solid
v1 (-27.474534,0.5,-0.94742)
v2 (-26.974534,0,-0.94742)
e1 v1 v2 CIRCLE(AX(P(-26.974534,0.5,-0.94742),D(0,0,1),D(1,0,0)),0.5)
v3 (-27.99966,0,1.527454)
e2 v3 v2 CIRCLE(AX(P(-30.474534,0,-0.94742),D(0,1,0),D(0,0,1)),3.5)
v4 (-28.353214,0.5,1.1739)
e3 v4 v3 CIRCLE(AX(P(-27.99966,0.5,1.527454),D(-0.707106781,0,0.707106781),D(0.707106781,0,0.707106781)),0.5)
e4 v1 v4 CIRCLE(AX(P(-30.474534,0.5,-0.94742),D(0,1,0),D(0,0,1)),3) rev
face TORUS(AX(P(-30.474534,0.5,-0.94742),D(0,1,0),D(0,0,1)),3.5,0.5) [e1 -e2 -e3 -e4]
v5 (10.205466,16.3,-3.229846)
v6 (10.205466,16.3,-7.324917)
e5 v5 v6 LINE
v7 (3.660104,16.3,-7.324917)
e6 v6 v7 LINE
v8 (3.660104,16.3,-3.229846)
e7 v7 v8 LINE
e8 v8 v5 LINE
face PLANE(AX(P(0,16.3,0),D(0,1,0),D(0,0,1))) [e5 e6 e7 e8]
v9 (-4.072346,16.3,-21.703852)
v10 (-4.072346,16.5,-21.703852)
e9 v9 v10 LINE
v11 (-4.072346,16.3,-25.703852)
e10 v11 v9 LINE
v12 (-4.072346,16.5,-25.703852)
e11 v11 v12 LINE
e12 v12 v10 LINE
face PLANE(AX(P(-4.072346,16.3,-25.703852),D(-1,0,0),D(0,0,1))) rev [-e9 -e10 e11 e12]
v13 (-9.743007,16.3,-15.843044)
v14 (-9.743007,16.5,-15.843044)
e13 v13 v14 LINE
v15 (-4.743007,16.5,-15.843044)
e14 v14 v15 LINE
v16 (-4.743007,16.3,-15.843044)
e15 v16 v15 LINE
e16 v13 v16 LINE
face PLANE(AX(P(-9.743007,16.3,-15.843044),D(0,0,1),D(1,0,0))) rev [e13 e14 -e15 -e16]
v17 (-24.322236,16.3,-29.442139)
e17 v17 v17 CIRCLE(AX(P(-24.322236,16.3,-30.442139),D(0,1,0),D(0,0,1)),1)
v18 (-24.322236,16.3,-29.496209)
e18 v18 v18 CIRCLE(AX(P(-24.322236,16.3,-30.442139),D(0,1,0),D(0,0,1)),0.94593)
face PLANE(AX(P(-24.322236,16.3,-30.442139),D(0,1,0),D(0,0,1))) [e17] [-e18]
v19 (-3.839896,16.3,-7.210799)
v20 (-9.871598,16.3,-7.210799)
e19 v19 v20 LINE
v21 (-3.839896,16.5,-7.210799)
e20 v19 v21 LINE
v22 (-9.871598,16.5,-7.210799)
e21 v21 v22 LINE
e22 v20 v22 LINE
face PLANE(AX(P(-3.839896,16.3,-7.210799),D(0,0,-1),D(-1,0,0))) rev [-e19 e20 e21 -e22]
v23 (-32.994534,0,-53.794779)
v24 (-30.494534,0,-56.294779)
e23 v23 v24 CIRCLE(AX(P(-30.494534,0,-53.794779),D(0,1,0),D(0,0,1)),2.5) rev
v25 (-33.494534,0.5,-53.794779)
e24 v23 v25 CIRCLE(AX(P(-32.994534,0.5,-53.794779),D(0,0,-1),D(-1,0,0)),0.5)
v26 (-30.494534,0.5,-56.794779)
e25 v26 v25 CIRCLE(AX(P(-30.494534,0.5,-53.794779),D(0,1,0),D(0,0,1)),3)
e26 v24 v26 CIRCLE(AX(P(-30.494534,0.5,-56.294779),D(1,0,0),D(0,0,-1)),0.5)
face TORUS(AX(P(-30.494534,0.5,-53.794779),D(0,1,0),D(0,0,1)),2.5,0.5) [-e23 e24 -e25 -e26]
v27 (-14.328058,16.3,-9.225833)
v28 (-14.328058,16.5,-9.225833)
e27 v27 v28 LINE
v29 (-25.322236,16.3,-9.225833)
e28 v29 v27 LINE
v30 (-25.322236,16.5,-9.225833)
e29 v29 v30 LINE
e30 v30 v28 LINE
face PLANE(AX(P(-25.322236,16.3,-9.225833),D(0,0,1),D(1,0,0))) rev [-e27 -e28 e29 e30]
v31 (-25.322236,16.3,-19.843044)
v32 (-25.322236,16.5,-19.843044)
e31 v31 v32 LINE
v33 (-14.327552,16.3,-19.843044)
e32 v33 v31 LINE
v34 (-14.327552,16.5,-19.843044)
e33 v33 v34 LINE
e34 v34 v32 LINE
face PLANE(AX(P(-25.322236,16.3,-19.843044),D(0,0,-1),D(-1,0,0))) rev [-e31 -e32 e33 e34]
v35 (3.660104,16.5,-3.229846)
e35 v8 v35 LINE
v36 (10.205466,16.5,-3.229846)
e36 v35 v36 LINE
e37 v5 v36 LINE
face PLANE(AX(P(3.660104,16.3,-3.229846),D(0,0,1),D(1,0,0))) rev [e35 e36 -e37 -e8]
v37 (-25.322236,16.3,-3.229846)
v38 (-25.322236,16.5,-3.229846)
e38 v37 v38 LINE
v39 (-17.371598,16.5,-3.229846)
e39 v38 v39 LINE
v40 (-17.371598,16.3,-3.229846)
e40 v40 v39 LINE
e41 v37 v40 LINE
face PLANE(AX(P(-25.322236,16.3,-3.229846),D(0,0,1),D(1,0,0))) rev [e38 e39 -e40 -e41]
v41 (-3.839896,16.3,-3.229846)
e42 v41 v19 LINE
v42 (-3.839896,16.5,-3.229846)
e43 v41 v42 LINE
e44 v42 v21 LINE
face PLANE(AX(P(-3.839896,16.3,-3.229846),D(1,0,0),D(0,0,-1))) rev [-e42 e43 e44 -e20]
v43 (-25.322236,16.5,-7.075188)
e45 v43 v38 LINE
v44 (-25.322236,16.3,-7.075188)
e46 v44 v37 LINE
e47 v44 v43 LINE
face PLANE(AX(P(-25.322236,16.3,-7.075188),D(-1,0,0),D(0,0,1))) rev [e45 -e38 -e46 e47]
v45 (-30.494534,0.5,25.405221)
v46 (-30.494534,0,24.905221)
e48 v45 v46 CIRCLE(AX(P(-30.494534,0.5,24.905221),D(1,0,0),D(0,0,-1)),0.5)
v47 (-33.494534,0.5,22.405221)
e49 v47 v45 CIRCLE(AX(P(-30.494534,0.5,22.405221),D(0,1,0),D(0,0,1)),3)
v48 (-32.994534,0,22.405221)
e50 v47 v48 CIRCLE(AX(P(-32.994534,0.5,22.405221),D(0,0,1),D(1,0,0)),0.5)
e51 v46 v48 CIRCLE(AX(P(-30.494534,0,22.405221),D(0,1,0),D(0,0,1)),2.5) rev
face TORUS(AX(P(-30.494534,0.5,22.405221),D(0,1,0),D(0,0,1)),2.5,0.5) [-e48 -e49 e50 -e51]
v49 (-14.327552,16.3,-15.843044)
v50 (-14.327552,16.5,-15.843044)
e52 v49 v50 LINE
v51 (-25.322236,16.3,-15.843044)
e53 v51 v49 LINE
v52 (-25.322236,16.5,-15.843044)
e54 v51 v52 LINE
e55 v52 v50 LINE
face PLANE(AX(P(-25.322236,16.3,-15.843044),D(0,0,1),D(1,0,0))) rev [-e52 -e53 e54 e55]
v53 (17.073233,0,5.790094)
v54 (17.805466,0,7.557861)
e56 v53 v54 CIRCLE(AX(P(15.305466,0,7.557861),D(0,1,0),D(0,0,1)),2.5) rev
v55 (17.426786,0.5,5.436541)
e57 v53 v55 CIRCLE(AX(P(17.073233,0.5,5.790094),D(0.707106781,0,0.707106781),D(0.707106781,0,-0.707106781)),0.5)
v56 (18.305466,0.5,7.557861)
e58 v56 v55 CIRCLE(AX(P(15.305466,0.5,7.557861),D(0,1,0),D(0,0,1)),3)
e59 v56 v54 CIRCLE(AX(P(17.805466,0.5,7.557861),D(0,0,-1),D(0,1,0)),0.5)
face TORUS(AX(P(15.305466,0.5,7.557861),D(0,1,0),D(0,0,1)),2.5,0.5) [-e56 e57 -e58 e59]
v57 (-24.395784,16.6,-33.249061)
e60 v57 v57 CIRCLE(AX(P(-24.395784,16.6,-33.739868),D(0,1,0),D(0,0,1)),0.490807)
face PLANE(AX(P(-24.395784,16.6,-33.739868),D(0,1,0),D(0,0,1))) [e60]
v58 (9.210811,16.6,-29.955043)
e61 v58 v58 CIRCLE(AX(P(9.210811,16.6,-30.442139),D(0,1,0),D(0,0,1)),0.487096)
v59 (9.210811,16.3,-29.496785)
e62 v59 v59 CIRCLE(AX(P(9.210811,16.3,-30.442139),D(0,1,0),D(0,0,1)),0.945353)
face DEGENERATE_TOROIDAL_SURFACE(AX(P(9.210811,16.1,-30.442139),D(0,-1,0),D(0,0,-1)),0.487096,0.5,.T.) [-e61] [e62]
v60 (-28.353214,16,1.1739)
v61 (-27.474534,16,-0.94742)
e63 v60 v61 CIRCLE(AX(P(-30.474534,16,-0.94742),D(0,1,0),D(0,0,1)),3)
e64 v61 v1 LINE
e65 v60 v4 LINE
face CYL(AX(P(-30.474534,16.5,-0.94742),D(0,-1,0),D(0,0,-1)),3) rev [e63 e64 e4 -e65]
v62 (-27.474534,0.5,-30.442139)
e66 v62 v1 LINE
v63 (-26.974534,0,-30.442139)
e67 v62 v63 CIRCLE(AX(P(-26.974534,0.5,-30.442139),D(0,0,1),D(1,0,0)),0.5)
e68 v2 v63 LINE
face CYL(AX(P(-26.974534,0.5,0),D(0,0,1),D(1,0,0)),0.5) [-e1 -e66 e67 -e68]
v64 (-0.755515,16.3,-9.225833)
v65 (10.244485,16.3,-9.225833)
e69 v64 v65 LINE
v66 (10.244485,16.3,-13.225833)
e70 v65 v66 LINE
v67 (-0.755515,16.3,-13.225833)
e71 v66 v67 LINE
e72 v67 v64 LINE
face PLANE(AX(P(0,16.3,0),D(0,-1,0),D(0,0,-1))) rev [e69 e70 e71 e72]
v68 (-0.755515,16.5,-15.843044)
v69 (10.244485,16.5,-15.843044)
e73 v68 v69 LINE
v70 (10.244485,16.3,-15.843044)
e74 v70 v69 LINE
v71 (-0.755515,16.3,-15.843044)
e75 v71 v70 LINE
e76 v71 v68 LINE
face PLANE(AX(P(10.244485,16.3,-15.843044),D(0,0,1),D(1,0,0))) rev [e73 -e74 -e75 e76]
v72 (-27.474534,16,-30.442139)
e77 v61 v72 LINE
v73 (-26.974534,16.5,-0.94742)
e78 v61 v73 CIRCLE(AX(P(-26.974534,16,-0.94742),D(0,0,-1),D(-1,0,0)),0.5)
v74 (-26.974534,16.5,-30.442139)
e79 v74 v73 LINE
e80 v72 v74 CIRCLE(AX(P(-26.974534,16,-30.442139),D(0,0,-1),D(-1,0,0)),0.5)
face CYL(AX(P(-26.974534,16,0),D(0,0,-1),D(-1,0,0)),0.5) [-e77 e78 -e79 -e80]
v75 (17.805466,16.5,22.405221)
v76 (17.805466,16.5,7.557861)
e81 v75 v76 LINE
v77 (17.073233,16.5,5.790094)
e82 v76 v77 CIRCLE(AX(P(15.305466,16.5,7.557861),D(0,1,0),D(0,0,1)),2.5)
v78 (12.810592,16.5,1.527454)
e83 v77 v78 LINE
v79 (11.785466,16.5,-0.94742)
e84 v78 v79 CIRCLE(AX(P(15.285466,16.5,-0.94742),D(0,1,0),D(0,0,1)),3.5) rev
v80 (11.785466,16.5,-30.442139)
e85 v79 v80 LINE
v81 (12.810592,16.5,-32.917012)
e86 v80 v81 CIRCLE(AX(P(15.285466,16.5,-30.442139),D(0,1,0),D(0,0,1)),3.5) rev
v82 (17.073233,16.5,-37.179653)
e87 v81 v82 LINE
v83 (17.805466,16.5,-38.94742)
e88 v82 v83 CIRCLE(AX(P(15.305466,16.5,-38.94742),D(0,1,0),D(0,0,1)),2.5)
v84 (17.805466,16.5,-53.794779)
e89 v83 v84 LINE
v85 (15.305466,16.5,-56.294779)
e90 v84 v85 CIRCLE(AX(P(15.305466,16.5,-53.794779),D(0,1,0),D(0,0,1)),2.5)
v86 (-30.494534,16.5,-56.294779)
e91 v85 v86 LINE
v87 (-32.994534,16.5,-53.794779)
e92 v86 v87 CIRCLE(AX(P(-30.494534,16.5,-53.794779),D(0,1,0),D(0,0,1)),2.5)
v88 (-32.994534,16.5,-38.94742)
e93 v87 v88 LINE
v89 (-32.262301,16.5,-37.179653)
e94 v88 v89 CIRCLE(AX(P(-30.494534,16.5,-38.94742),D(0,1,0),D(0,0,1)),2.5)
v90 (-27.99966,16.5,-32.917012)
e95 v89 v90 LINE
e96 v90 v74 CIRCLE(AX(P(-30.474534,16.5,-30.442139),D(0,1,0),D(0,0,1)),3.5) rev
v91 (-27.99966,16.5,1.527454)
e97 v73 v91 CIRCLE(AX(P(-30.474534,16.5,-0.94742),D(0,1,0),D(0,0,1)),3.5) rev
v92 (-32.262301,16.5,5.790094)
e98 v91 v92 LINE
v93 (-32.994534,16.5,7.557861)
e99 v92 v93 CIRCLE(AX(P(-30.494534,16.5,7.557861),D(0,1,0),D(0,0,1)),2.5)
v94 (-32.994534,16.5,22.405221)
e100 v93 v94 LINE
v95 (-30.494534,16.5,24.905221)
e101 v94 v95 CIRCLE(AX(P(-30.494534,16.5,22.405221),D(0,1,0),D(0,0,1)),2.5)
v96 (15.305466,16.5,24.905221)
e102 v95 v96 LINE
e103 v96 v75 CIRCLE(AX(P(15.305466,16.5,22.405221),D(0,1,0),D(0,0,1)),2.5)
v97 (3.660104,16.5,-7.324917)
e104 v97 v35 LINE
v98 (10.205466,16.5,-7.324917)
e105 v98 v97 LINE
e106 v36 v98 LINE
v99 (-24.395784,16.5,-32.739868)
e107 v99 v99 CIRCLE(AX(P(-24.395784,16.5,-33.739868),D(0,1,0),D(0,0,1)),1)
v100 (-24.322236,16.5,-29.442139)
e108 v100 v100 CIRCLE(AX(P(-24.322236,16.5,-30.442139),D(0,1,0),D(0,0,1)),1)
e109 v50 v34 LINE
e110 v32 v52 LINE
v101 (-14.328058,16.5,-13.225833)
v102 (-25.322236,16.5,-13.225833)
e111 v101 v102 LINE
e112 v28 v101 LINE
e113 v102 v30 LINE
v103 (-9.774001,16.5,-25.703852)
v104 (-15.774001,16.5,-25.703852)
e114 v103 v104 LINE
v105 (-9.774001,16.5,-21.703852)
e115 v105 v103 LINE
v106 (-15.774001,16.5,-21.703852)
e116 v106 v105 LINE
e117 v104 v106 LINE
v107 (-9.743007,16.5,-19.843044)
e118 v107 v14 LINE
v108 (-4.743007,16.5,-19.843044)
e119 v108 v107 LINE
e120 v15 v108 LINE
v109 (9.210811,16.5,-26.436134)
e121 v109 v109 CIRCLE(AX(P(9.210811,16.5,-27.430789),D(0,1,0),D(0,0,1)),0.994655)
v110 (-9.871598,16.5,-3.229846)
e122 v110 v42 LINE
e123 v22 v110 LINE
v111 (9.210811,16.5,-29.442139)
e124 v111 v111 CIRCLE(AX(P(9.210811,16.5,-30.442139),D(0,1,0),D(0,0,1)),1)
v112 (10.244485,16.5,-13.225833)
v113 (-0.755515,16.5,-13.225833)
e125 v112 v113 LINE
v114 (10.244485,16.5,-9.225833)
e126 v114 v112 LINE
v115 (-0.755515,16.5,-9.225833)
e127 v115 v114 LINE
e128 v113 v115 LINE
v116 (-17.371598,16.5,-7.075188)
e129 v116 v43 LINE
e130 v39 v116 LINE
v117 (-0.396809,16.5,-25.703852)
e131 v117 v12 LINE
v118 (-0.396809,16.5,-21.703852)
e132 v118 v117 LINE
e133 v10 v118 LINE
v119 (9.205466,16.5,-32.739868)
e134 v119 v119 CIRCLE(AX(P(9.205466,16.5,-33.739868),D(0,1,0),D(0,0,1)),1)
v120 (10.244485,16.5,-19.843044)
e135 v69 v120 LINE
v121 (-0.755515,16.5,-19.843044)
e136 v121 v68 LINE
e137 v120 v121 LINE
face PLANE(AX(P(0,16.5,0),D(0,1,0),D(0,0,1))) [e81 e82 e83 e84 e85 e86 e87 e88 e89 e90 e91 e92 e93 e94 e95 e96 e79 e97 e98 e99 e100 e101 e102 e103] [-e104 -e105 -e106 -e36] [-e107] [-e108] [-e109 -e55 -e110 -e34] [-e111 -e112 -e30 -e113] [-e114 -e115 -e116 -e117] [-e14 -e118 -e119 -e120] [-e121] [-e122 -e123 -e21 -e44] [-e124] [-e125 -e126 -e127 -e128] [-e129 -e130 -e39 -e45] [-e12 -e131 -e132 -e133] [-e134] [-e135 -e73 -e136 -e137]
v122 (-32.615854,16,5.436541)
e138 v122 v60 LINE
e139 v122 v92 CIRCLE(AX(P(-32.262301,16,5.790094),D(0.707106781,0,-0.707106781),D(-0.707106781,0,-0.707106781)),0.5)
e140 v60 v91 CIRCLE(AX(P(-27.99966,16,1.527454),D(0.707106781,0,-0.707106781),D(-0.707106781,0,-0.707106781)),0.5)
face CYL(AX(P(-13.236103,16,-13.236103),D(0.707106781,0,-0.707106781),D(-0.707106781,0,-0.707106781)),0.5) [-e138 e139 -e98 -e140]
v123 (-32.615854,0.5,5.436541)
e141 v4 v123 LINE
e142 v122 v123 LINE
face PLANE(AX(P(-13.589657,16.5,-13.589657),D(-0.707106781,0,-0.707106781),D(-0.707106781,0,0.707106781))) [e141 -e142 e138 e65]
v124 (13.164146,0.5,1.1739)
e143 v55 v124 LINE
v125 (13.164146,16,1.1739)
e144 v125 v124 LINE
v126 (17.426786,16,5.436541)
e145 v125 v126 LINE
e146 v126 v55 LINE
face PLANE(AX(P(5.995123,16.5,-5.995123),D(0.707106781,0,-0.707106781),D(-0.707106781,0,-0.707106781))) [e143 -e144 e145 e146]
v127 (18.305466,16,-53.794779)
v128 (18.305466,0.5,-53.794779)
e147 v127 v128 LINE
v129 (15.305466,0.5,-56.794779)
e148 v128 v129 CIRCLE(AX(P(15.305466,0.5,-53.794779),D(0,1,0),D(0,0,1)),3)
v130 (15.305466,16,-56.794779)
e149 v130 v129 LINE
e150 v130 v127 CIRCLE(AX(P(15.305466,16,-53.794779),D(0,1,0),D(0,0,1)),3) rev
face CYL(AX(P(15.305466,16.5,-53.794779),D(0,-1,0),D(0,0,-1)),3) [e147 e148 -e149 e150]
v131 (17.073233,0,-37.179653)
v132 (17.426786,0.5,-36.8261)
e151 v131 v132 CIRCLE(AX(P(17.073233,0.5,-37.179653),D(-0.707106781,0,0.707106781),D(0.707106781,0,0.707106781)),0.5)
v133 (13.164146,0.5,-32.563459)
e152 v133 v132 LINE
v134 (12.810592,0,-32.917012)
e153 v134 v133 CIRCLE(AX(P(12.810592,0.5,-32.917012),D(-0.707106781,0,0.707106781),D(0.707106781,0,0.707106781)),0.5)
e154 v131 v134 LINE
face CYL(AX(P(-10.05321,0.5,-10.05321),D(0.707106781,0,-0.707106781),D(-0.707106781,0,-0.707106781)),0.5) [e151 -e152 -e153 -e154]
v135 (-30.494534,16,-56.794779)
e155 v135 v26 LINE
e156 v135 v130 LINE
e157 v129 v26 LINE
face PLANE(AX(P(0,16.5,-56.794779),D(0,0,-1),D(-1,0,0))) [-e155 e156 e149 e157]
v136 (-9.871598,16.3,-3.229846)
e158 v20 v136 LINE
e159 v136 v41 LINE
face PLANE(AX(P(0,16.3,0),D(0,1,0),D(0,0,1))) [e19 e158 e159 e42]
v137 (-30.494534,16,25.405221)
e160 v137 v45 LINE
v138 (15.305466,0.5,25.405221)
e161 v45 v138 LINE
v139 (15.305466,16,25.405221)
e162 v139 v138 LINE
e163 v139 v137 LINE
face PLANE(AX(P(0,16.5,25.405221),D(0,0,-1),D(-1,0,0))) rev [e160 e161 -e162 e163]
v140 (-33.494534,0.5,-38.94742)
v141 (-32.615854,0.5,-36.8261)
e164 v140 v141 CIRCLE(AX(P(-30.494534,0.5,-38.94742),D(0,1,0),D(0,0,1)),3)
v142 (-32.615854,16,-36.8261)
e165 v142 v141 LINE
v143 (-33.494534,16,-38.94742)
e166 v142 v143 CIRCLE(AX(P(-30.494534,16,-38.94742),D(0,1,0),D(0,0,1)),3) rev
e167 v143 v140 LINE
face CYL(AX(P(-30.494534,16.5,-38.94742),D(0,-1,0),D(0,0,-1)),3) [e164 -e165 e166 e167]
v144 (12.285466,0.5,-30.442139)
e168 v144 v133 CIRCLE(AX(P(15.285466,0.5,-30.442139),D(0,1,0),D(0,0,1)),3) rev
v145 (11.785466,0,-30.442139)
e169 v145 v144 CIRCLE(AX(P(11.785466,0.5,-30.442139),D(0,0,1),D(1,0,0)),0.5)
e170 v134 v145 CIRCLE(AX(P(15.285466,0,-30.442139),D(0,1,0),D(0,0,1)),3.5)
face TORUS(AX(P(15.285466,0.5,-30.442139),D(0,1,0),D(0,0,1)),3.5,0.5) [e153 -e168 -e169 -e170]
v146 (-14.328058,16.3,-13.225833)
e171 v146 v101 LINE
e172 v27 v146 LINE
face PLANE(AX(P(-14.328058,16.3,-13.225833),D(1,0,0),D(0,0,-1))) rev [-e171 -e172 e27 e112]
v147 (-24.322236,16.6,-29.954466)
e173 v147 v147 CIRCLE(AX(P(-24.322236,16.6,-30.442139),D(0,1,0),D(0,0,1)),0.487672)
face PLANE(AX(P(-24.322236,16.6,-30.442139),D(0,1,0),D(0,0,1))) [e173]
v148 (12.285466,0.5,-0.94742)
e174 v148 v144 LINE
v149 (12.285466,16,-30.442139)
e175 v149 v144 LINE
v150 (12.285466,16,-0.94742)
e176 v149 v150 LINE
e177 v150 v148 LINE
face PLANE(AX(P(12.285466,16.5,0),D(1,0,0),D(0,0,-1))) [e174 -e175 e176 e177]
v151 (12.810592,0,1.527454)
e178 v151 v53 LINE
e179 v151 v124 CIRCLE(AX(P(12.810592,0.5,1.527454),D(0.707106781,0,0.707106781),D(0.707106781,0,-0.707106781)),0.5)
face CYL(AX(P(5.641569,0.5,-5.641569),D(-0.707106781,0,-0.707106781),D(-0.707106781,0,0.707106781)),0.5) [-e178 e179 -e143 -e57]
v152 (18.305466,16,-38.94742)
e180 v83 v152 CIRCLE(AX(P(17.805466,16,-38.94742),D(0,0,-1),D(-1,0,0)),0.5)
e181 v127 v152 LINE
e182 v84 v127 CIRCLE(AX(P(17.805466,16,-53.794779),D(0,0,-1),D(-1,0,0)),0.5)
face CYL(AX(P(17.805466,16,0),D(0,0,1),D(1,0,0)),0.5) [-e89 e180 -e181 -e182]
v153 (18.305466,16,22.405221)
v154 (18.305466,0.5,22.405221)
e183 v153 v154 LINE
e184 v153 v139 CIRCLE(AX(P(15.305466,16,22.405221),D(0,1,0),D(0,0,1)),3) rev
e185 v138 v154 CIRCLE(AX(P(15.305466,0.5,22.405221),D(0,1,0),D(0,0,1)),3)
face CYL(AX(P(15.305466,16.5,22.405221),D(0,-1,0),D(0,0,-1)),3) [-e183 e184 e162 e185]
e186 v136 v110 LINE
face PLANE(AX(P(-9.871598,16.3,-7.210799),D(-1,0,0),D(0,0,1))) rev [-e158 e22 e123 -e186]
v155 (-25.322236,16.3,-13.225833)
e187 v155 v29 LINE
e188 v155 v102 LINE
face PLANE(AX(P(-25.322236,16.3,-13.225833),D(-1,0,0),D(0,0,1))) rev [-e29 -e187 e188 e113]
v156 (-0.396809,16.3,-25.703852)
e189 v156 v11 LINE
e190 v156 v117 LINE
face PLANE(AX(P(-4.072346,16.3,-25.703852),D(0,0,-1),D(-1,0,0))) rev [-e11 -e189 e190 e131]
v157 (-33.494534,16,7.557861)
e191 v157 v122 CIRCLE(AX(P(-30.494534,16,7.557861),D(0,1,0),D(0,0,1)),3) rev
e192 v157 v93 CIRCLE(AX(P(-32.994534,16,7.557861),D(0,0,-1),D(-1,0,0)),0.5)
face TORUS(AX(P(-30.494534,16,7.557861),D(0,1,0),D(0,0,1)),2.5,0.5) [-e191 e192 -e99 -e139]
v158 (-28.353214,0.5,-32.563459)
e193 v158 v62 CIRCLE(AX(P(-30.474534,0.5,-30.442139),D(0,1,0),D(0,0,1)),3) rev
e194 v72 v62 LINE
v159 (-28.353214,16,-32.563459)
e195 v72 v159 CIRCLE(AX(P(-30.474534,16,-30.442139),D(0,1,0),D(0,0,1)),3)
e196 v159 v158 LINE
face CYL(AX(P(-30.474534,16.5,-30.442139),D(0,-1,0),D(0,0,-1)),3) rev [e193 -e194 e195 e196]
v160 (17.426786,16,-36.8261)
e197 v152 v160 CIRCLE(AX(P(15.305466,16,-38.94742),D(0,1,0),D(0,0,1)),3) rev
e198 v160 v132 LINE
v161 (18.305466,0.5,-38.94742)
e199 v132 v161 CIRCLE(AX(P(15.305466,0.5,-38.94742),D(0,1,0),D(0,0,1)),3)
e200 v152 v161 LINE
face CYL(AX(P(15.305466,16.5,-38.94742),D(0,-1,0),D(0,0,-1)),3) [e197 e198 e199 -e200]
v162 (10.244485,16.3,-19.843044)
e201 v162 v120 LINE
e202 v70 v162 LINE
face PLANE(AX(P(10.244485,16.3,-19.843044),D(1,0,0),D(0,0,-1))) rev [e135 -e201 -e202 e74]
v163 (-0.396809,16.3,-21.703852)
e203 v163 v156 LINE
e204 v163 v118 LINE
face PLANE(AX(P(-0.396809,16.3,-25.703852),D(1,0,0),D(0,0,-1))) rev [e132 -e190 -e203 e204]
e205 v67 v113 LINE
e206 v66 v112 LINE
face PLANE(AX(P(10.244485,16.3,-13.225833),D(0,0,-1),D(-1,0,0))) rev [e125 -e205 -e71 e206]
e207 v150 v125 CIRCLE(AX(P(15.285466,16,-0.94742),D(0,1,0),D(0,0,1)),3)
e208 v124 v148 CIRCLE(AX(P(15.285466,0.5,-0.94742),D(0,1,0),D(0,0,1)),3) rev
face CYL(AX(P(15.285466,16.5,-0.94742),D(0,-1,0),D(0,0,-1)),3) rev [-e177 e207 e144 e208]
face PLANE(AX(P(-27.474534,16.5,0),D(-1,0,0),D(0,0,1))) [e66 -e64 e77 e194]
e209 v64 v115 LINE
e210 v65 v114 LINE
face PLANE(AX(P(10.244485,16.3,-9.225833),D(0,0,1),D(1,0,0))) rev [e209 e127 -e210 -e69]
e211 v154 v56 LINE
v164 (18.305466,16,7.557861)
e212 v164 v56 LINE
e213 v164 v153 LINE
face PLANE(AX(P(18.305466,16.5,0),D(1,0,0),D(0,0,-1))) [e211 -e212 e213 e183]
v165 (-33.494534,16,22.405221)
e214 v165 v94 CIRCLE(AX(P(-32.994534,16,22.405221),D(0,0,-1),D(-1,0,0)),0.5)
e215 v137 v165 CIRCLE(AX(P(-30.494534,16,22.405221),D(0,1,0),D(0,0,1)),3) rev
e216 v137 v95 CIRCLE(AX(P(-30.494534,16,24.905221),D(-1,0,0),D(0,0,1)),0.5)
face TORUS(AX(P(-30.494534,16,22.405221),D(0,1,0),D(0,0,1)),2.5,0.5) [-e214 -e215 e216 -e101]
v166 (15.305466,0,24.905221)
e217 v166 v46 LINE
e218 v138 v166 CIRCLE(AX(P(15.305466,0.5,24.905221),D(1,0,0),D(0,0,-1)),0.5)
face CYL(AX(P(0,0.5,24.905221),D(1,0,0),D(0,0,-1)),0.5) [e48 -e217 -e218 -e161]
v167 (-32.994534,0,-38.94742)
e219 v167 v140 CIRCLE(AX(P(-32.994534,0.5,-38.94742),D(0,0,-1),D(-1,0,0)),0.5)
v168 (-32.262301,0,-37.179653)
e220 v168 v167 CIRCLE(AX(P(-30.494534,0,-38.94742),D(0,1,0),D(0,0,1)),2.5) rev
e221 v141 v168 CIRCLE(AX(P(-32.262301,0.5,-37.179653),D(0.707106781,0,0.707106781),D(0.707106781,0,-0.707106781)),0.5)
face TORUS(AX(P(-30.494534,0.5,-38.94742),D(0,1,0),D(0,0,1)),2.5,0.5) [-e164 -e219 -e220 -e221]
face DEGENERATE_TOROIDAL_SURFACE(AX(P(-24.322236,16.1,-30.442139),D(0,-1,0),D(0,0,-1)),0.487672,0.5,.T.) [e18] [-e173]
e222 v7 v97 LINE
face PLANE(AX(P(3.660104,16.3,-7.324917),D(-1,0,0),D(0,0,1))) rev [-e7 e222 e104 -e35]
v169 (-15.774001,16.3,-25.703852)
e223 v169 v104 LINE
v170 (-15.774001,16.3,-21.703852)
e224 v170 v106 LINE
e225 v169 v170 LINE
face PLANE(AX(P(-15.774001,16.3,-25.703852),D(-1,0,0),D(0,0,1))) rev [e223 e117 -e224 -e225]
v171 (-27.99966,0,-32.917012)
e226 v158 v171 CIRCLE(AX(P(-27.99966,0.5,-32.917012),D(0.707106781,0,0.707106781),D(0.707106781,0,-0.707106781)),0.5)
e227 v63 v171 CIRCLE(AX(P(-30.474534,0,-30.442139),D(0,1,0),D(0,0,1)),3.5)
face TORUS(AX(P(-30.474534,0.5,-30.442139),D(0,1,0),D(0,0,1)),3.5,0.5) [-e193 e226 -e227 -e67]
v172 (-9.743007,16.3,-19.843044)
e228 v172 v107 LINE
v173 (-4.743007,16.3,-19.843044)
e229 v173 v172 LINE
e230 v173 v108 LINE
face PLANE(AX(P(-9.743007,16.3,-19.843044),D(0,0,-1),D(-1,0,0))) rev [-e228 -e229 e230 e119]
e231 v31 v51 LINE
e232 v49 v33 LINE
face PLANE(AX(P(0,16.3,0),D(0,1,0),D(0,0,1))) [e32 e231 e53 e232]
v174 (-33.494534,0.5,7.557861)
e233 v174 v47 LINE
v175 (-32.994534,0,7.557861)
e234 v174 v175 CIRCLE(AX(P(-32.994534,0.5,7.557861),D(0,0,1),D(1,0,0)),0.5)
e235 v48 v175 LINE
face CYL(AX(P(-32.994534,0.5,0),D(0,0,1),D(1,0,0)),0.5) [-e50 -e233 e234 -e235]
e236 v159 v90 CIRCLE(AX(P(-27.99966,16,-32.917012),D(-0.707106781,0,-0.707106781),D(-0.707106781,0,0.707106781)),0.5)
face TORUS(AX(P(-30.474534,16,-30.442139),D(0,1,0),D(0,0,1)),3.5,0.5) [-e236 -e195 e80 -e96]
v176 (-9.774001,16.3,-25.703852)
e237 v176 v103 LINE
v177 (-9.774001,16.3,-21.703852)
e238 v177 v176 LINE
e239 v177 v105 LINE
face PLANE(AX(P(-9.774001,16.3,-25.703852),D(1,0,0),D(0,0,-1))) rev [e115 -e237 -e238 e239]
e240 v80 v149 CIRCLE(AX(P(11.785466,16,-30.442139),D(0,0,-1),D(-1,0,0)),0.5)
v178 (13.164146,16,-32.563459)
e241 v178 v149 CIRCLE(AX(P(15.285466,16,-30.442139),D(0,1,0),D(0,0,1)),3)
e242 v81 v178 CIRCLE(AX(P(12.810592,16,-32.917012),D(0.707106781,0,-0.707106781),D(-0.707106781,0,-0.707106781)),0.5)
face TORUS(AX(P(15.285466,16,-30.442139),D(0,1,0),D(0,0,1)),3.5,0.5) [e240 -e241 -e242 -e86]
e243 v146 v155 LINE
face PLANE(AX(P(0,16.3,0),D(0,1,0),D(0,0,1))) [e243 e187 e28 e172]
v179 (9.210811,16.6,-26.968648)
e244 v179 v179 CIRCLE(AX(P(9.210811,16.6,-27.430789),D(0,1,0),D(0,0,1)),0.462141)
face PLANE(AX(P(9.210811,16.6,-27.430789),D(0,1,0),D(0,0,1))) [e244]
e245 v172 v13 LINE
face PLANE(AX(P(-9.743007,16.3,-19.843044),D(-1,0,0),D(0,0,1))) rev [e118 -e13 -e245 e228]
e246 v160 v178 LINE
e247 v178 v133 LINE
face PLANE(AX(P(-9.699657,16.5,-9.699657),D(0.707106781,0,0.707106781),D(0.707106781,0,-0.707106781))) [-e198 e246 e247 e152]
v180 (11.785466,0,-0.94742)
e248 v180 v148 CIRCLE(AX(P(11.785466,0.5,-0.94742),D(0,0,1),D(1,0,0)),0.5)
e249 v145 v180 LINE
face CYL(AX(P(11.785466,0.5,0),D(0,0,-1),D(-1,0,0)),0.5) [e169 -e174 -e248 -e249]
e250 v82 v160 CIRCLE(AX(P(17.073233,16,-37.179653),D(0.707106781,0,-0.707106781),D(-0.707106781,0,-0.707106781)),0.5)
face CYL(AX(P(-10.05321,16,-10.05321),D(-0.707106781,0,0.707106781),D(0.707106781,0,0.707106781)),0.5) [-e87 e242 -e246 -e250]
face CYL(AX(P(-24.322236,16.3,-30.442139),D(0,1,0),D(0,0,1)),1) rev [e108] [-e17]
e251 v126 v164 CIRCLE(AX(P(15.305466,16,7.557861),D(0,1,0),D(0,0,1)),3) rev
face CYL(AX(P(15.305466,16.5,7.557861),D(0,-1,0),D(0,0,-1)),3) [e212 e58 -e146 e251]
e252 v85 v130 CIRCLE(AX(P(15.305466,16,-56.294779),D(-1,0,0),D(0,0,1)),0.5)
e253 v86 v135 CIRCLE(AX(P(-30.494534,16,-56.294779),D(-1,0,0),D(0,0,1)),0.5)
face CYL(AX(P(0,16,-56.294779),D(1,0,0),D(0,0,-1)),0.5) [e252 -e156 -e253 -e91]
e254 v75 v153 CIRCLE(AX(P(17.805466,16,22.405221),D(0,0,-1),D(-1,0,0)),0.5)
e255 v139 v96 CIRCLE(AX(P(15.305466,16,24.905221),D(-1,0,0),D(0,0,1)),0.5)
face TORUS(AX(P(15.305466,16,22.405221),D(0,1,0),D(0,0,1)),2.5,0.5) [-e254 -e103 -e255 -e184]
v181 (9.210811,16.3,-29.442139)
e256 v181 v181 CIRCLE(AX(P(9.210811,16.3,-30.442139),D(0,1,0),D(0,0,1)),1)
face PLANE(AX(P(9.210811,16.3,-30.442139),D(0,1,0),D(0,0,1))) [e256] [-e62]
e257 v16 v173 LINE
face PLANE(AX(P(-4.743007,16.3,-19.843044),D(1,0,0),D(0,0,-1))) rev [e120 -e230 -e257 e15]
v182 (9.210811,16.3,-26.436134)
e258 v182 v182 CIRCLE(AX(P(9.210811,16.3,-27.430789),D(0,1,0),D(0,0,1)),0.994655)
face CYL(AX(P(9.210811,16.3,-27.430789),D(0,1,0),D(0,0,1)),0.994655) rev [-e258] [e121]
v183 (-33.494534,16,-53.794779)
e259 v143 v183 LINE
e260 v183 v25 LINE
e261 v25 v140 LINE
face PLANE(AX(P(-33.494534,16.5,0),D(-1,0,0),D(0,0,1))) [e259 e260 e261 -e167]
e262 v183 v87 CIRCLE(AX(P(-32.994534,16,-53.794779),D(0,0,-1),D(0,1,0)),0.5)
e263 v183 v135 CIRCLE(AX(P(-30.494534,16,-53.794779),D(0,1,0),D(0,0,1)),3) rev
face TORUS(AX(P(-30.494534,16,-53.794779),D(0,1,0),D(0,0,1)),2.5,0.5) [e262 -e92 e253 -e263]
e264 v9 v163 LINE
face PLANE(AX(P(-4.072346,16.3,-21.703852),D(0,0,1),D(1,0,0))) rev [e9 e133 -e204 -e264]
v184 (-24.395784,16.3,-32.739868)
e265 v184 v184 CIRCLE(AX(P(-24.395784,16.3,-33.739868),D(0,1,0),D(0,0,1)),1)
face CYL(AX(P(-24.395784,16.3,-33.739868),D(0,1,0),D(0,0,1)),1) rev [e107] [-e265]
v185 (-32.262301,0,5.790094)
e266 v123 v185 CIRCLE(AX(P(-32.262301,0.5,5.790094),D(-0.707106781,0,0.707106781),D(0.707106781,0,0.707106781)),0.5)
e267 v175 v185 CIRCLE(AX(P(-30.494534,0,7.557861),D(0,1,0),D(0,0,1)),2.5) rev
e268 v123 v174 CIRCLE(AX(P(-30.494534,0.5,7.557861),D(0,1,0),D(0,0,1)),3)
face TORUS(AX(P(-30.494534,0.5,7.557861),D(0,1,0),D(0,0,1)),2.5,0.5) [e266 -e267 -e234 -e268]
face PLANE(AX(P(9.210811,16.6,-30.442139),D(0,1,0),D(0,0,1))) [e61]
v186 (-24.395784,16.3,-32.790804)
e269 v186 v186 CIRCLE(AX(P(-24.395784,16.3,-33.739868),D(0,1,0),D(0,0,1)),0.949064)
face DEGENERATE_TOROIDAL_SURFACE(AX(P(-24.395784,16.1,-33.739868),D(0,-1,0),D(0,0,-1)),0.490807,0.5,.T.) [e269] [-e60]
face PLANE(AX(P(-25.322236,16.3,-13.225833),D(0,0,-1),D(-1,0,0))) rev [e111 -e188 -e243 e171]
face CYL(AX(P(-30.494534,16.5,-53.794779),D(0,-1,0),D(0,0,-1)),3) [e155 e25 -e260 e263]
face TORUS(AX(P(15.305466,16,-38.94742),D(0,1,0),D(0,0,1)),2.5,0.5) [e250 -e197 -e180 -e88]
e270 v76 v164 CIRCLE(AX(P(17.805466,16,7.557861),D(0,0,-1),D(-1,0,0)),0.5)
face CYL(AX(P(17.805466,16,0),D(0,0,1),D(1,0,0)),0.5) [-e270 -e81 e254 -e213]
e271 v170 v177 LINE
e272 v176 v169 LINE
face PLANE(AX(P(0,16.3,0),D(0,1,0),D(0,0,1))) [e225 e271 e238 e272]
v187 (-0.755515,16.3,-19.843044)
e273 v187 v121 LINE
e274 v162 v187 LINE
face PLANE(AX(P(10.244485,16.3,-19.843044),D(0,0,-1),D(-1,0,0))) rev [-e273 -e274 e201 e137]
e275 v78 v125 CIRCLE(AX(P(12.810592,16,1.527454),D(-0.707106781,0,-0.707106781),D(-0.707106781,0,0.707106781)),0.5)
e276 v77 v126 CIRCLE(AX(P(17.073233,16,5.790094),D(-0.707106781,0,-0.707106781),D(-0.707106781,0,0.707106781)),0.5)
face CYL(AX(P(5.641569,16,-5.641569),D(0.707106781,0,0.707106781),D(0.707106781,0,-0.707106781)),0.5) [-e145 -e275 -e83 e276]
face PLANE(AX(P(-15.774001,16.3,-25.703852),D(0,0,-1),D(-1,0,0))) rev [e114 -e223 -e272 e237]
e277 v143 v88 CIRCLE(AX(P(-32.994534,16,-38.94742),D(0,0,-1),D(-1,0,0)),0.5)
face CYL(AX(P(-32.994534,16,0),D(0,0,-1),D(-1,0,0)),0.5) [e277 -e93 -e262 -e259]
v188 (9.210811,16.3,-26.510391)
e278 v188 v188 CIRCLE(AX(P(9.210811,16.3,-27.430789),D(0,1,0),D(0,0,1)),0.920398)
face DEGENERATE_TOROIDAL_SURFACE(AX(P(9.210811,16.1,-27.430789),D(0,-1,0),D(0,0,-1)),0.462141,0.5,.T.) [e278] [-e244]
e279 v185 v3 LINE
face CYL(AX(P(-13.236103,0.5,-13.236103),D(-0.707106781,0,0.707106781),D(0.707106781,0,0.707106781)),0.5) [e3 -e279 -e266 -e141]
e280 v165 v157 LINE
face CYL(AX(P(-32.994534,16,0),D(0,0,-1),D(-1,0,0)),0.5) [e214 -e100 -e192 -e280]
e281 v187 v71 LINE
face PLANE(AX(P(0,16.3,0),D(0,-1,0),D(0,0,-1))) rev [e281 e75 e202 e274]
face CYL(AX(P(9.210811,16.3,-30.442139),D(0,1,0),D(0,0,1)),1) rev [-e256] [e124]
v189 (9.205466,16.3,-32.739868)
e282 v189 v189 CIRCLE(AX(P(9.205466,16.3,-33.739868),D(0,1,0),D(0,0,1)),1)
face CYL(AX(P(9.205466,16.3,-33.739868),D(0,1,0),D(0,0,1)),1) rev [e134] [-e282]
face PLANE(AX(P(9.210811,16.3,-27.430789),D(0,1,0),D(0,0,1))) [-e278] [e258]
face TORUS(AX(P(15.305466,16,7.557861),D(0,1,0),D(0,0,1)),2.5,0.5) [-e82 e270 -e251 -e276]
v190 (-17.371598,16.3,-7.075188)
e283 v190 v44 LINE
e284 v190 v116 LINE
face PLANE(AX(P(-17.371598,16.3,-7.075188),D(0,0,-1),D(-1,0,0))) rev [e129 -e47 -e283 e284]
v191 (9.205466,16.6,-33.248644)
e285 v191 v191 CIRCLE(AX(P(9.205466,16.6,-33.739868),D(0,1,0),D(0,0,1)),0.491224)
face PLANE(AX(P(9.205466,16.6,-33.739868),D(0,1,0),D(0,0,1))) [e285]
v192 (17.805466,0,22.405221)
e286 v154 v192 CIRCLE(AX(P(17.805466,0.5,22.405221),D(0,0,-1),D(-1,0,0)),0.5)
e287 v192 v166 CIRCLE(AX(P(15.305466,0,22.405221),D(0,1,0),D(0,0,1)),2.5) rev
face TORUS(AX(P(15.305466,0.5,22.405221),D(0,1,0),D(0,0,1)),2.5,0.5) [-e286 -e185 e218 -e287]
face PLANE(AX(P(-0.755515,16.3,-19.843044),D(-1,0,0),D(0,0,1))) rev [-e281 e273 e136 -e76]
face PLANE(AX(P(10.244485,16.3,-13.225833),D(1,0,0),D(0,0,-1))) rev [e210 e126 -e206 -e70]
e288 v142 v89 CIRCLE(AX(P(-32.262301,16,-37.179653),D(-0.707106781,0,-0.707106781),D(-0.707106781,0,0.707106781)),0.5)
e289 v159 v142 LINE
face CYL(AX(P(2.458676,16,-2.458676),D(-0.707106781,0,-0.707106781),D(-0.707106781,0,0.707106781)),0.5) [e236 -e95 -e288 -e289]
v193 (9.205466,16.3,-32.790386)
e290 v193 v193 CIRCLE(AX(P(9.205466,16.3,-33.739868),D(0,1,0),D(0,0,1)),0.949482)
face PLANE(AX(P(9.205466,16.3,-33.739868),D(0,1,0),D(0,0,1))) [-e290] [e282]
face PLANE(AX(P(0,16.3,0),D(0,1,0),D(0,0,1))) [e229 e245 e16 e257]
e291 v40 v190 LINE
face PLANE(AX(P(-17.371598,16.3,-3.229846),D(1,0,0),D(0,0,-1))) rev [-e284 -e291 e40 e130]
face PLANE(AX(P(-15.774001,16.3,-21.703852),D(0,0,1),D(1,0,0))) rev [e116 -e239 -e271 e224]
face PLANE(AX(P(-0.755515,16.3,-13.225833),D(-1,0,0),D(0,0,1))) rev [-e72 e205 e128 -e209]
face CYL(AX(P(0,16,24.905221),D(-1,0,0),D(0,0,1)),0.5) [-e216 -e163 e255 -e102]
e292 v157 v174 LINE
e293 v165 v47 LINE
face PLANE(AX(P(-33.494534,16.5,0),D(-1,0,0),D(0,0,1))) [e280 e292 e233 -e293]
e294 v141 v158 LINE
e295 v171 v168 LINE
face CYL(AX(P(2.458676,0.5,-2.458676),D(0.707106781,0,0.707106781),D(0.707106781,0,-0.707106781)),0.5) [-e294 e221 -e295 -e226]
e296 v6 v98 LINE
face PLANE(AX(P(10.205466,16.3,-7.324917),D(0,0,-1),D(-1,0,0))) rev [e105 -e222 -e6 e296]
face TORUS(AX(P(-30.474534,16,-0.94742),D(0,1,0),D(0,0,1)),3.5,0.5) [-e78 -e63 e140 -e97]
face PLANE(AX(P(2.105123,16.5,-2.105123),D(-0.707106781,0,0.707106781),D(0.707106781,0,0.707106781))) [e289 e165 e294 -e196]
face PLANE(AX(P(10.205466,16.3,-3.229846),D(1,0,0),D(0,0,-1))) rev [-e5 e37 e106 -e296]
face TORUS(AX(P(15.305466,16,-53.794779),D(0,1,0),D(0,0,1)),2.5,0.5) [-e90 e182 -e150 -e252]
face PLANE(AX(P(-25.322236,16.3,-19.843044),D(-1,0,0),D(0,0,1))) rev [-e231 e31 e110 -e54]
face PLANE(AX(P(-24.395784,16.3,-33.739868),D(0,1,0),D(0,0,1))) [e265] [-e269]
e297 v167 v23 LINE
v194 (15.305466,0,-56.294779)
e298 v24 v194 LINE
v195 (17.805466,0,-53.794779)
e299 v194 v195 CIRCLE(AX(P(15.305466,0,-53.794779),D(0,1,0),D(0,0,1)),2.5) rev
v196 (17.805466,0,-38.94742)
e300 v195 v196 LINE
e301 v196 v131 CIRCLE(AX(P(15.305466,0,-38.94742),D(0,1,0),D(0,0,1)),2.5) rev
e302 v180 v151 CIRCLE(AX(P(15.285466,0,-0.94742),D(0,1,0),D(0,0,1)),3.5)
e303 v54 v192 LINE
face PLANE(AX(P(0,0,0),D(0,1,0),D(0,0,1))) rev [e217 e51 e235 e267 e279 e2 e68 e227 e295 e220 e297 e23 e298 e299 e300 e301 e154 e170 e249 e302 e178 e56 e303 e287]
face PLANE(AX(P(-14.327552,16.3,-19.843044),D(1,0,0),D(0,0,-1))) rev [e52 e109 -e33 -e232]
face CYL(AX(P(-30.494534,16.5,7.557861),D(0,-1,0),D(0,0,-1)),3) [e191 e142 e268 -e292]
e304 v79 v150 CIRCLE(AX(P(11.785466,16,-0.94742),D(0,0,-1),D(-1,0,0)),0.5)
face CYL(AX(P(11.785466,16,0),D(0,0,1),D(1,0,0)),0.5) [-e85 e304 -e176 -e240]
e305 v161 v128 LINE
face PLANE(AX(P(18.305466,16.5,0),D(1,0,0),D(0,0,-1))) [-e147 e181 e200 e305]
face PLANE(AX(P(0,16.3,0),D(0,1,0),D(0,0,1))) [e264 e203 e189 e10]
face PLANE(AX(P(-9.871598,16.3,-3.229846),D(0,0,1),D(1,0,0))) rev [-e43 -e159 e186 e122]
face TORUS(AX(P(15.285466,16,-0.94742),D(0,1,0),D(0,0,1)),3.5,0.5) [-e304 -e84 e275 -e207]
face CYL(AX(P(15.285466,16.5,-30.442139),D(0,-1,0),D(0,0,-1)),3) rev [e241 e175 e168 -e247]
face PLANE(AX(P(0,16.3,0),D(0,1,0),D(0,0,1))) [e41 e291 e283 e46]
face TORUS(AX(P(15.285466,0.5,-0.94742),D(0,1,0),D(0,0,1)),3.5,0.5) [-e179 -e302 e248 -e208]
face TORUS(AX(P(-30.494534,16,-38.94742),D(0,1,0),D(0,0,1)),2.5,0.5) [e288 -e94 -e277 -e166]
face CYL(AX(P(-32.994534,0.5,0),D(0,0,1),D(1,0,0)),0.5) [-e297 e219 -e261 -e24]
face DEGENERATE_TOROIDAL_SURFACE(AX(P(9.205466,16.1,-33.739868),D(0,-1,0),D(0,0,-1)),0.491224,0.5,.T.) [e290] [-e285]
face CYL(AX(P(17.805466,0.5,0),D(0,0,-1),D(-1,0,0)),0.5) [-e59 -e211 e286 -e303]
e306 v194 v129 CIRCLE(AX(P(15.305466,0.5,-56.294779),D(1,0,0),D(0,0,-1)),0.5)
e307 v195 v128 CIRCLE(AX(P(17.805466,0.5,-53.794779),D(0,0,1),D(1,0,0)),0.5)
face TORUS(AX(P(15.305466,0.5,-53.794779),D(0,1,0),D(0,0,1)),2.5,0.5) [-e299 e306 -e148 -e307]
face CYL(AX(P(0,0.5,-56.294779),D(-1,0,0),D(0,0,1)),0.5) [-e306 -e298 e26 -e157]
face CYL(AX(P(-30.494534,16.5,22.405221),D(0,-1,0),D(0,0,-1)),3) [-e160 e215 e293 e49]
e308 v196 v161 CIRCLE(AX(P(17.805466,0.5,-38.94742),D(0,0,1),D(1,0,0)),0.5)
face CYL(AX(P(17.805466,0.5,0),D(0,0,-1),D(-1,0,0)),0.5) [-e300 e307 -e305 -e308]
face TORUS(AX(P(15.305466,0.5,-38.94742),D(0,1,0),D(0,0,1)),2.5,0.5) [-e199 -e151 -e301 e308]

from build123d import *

# Parameters (mm, degrees)
Y_KSEKLIK_EKSTR_ZYON1_DEPTH  = 16.5
RADYUS1_R                    = 0.5
IZIM4_R                      = 1
IZIM4_R_2                    = 0.994654728
IZIM4_W                      = 6
IZIM4_H                      = 4
IZIM4_W_2                    = 7.950638325
IZIM4_H_2                    = 3.84534267
IZIM4_W_3                    = 6.545361945
IZIM4_H_3                    = 4.095070952
IZIM4_W_4                    = 6.031701882
IZIM4_H_4                    = 3.980953237
IZIM4_W_5                    = 10.994178329
IZIM4_W_6                    = 11
IZIM4_W_7                    = 10.994684561
IZIM4_W_8                    = 5
IZIM4_W_9                    = 3.675536493
KES_EKSTR_ZYON2_DEPTH        = 0.2
IZIM7_R                      = 0.945353226
Y_KSEKLIK_EKSTR_ZYON6_DEPTH  = 0.3
RADYUS6_R                    = 0.5
IZIM8_R                      = 0.920398329
Y_KSEKLIK_EKSTR_ZYON8_DEPTH  = 0.3
RADYUS7_R                    = 0.5
IZIM9_R                      = 0.945929805
Y_KSEKLIK_EKSTR_ZYON9_DEPTH  = 0.3
RADYUS8_R                    = 0.5
IZIM10_R                     = 0.949064343
Y_KSEKLIK_EKSTR_ZYON10_DEPTH = 0.3
RADYUS9_R                    = 0.5
IZIM11_R                     = 0.949481873
Y_KSEKLIK_EKSTR_ZYON11_DEPTH = 0.3
RADYUS10_R                   = 0.5


with BuildPart() as part:
    # Çizim2 → Yükseklik-Ekstrüzyon1 (new body)
    with BuildSketch(Plane(origin=(0, 0, 0), x_dir=(1, 0, 0), z_dir=(0, 1, 0))):
        with BuildLine():
            Line((-33.494534037, 38.947420014), (-33.494534037, 53.794779327))
            ThreePointArc((-33.494534037, 53.794779327), (-32.615854381, 55.91609967), (-30.494534037, 56.794779327))
            Line((-30.494534037, 56.794779327), (15.305465963, 56.794779327))
            ThreePointArc((15.305465963, 56.794779327), (17.426786307, 55.91609967), (18.305465963, 53.794779327))
            Line((18.305465963, 53.794779327), (18.305465963, 38.947420014))
            ThreePointArc((18.305465963, 38.947420014), (18.07710456, 37.799369717), (17.426786307, 36.82609967))
            Line((17.426786307, 36.82609967), (13.164145619, 32.563458983))
            ThreePointArc((13.164145619, 32.563458983), (12.513827365, 31.590188937), (12.285465963, 30.442138639))
            Line((12.285465963, 30.442138639), (12.285465963, 0.947420014))
            ThreePointArc((12.285465963, 0.947420014), (12.513827365, -0.200630283), (13.164145619, -1.17390033))
            Line((13.164145619, -1.17390033), (17.426786307, -5.436541017))
            ThreePointArc((17.426786307, -5.436541017), (18.07710456, -6.409811063), (18.305465963, -7.557861361))
            Line((18.305465963, -7.557861361), (18.305465963, -22.405220673))
            ThreePointArc((18.305465963, -22.405220673), (17.426786307, -24.526541017), (15.305465963, -25.405220673))
            Line((15.305465963, -25.405220673), (-30.494534037, -25.405220673))
            ThreePointArc((-30.494534037, -25.405220673), (-32.615854381, -24.526541017), (-33.494534037, -22.405220673))
            Line((-33.494534037, -22.405220673), (-33.494534037, -7.557861361))
            ThreePointArc((-33.494534037, -7.557861361), (-33.266172635, -6.409811063), (-32.615854381, -5.436541017))
            Line((-32.615854381, -5.436541017), (-28.353213693, -1.17390033))
            ThreePointArc((-28.353213693, -1.17390033), (-27.70289544, -0.200630283), (-27.474534037, 0.947420014))
            Line((-27.474534037, 0.947420014), (-27.474534037, 30.442138639))
            ThreePointArc((-27.474534037, 30.442138639), (-27.70289544, 31.590188937), (-28.353213693, 32.563458983))
            Line((-28.353213693, 32.563458983), (-32.615854381, 36.82609967))
            ThreePointArc((-32.615854381, 36.82609967), (-33.266172635, 37.799369717), (-33.494534037, 38.947420014))
        make_face()
    extrude(amount=Y_KSEKLIK_EKSTR_ZYON1_DEPTH)

    # Radyus1
    radyus1_edges = [part.edges().sort_by_distance(p)[0] for p in [
        (18.07710456, 16.5, -37.799369717),
        (18.305465963, 16.5, -46.37109967),
        (-33.266172635, 16.5, -37.799369717),
        (17.426786307, 16.5, -55.91609967),
        (-7.594534037, 16.5, -56.794779327),
        (-32.615854381, 16.5, -55.91609967),
        (-30.484534037, 16.5, -34.694779327),
        (-27.70289544, 16.5, -31.590188937),
        (-32.615854381, 0, -55.91609967),
        (-27.474534037, 16.5, -15.694779327),
        (-7.594534037, 0, -56.794779327),
        (17.426786307, 0, -55.91609967),
        (18.305465963, 0, -46.37109967),
        (18.07710456, 0, -37.799369717),
        (15.295465963, 0, -34.694779327),
        (12.513827365, 0, -31.590188937),
        (12.285465963, 0, -15.694779327),
        (12.513827365, 0, 0.200630283),
        (15.295465963, 0, 3.305220673),
        (18.07710456, 0, 6.409811063),
        (-27.70289544, 16.5, 0.200630283),
        (18.305465963, 0, 14.981541017),
        (17.426786307, 0, 24.526541017),
        (-7.594534037, 0, 25.405220673),
        (-32.615854381, 0, 24.526541017),
        (-33.494534037, 0, 14.981541017),
        (-33.266172635, 0, 6.409811063),
        (-30.484534037, 0, 3.305220673),
        (-27.70289544, 0, 0.200630283),
        (-27.474534037, 0, -15.694779327),
        (-27.70289544, 0, -31.590188937),
        (-30.484534037, 16.5, 3.305220673),
        (-30.484534037, 0, -34.694779327),
        (-33.266172635, 0, -37.799369717),
        (-33.494534037, 0, -46.37109967),
        (-33.266172635, 16.5, 6.409811063),
        (-33.494534037, 16.5, 14.981541017),
        (-32.615854381, 16.5, 24.526541017),
        (-7.594534037, 16.5, 25.405220673),
        (-33.494534037, 16.5, -46.37109967),
        (17.426786307, 16.5, 24.526541017),
        (18.305465963, 16.5, 14.981541017),
        (18.07710456, 16.5, 6.409811063),
        (15.295465963, 16.5, 3.305220673),
        (12.513827365, 16.5, 0.200630283),
        (12.285465963, 16.5, -15.694779327),
        (12.513827365, 16.5, -31.590188937),
        (15.295465963, 16.5, -34.694779327),
    ]]
    fillet(radyus1_edges, radius=RADYUS1_R)

    # Çizim4 → Kes-Ekstrüzyon2 (cut)
    with BuildSketch(Plane(origin=(0, 16.5, 0), x_dir=(1, 0, 0), z_dir=(0, 1, 0))):
        with Locations(Location((9.210811234, 30.442138639, 0), (0, 0, 270))):
            Circle(IZIM4_R)
        with Locations(Location((9.205465963, 33.739868004, 0), (0, 0, 270))):
            Circle(IZIM4_R)
        with Locations(Location((9.210811234, 27.430789178, 0), (0, 0, 270))):
            Circle(IZIM4_R_2)
        with Locations(Location((-24.395783967, 33.739868004, 0), (0, 0, 270))):
            Circle(IZIM4_R)
        with Locations(Location((-24.322236189, 30.442138639, 0), (0, 0, 270))):
            Circle(IZIM4_R)
        with Locations((-12.774001102, 23.70385152)):
            Rectangle(IZIM4_W, IZIM4_H)
        with Locations((-21.346917027, 5.152516883)):
            Rectangle(IZIM4_W_2, IZIM4_H_2)
        with Locations((6.932784991, 5.277381024)):
            Rectangle(IZIM4_W_3, IZIM4_H_3)
        with Locations((-6.855746923, 5.220322167)):
            Rectangle(IZIM4_W_4, IZIM4_H_4)
        with Locations((-19.825147025, 11.225833129)):
            Rectangle(IZIM4_W_5, IZIM4_H)
        with Locations((4.744484602, 11.225833129)):
            Rectangle(IZIM4_W_6, IZIM4_H)
        with Locations((-19.824893909, 17.843043802)):
            Rectangle(IZIM4_W_7, IZIM4_H)
        with Locations((4.744484602, 17.843043802)):
            Rectangle(IZIM4_W_6, IZIM4_H)
        with Locations((-7.243006902, 17.843043802)):
            Rectangle(IZIM4_W_8, IZIM4_H)
        with Locations((-2.234577663, 23.70385152)):
            Rectangle(IZIM4_W_9, IZIM4_H)
    extrude(amount=-KES_EKSTR_ZYON2_DEPTH, mode=Mode.SUBTRACT)

    # Çizim7 → Yükseklik-Ekstrüzyon6 (add)
    with BuildSketch(Plane(origin=(0, 16.3, 0), x_dir=(1, 0, 0), z_dir=(0, 1, 0))):
        with Locations(Location((9.210811234, 30.442138639, 0), (0, 0, 270))):
            Circle(IZIM7_R)
    extrude(amount=Y_KSEKLIK_EKSTR_ZYON6_DEPTH)

    # Radyus6
    # the kernel refuses this fillet: 0.5 mm, written as the material it takes off along each edge
    with BuildSketch(Plane(origin=(9.210811234, 16.6, -30.442138639), x_dir=(0, 0, 1), z_dir=(-1, 0, 0))) as radyus6_piece_1:
        with BuildLine():
            CenterArc((0.487095656, -0.5), RADYUS6_R, 23.578178478, 66.421821522)
            Line((0.487095656, 0), (0.487095656, 0.01))
            Line((0.487095656, 0.01), (0.945353226, 0.01))
            Line((0.945353226, 0.01), (0.955353226, 0))
            ThreePointArc((0.955353226, 0), (0.955353226, -0.15), (0.954518377, -0.296))
            Line((0.954518377, -0.296), (0.945353226, -0.3))
        make_face()
    revolve(axis=Axis((9.210811234, 16.6, -30.442138639), (0, 1, 0)), mode=Mode.SUBTRACT)

    # Çizim8 → Yükseklik-Ekstrüzyon8 (add)
    with BuildSketch(Plane(origin=(0, 16.3, 0), x_dir=(1, 0, 0), z_dir=(0, 1, 0))):
        with Locations(Location((9.210811234, 27.430789178, 0), (0, 0, 270))):
            Circle(IZIM8_R)
    extrude(amount=Y_KSEKLIK_EKSTR_ZYON8_DEPTH)

    # Radyus7
    # the kernel refuses this fillet: 0.5 mm, written as the material it takes off along each edge
    with BuildSketch(Plane(origin=(9.210811234, 16.6, -27.430789178), x_dir=(0, 0, 1), z_dir=(-1, 0, 0))) as radyus7_piece_1:
        with BuildLine():
            CenterArc((0.462140759, -0.5), RADYUS7_R, 23.578178478, 66.421821522)
            Line((0.462140759, 0), (0.462140759, 0.01))
            Line((0.462140759, 0.01), (0.920398329, 0.01))
            Line((0.920398329, 0.01), (0.930398329, 0))
            ThreePointArc((0.930398329, 0), (0.930398329, -0.15), (0.92956348, -0.296))
            Line((0.92956348, -0.296), (0.920398329, -0.3))
        make_face()
    revolve(axis=Axis((9.210811234, 16.6, -27.430789178), (0, 1, 0)), mode=Mode.SUBTRACT)

    # Çizim9 → Yükseklik-Ekstrüzyon9 (add)
    with BuildSketch(Plane(origin=(0, 16.3, 0), x_dir=(1, 0, 0), z_dir=(0, 1, 0))):
        with Locations(Location((-24.322236189, 30.442138639, 0), (0, 0, 270))):
            Circle(IZIM9_R)
    extrude(amount=Y_KSEKLIK_EKSTR_ZYON9_DEPTH)

    # Radyus8
    # the kernel refuses this fillet: 0.5 mm, written as the material it takes off along each edge
    with BuildSketch(Plane(origin=(-24.322236189, 16.6, -30.442138639), x_dir=(0, 0, 1), z_dir=(-1, 0, 0))) as radyus8_piece_1:
        with BuildLine():
            CenterArc((0.487672235, -0.5), RADYUS8_R, 23.578178478, 66.421821522)
            Line((0.487672235, 0), (0.487672235, 0.01))
            Line((0.487672235, 0.01), (0.945929805, 0.01))
            Line((0.945929805, 0.01), (0.955929805, 0))
            ThreePointArc((0.955929805, 0), (0.955929805, -0.15), (0.955094956, -0.296))
            Line((0.955094956, -0.296), (0.945929805, -0.3))
        make_face()
    revolve(axis=Axis((-24.322236189, 16.6, -30.442138639), (0, 1, 0)), mode=Mode.SUBTRACT)

    # Çizim10 → Yükseklik-Ekstrüzyon10 (add)
    with BuildSketch(Plane(origin=(0, 16.3, 0), x_dir=(1, 0, 0), z_dir=(0, 1, 0))):
        with Locations(Location((-24.395783967, 33.739868004, 0), (0, 0, 270))):
            Circle(IZIM10_R)
    extrude(amount=Y_KSEKLIK_EKSTR_ZYON10_DEPTH)

    # Radyus9
    # the kernel refuses this fillet: 0.5 mm, written as the material it takes off along each edge
    with BuildSketch(Plane(origin=(-24.395783967, 16.6, -33.739868004), x_dir=(0, 0, 1), z_dir=(-1, 0, 0))) as radyus9_piece_1:
        with BuildLine():
            CenterArc((0.490806774, -0.5), RADYUS9_R, 23.578178478, 66.421821522)
            Line((0.490806774, 0), (0.490806774, 0.01))
            Line((0.490806774, 0.01), (0.949064343, 0.01))
            Line((0.949064343, 0.01), (0.959064343, 0))
            ThreePointArc((0.959064343, 0), (0.959064343, -0.15), (0.958229494, -0.296))
            Line((0.958229494, -0.296), (0.949064343, -0.3))
        make_face()
    revolve(axis=Axis((-24.395783967, 16.6, -33.739868004), (0, 1, 0)), mode=Mode.SUBTRACT)

    # Çizim11 → Yükseklik-Ekstrüzyon11 (add)
    with BuildSketch(Plane(origin=(0, 16.3, 0), x_dir=(1, 0, 0), z_dir=(0, 1, 0))):
        with Locations(Location((9.205465963, 33.739868004, 0), (0, 0, 270))):
            Circle(IZIM11_R)
    extrude(amount=Y_KSEKLIK_EKSTR_ZYON11_DEPTH)

    # Radyus10
    # the kernel refuses this fillet: 0.5 mm, written as the material it takes off along each edge
    with BuildSketch(Plane(origin=(9.205465963, 16.6, -33.739868004), x_dir=(0, 0, 1), z_dir=(-1, 0, 0))) as radyus10_piece_1:
        with BuildLine():
            CenterArc((0.491224304, -0.5), RADYUS10_R, 23.578178478, 66.421821522)
            Line((0.491224304, 0), (0.491224304, 0.01))
            Line((0.491224304, 0.01), (0.949481873, 0.01))
            Line((0.949481873, 0.01), (0.959481873, 0))
            ThreePointArc((0.959481873, 0), (0.959481873, -0.15), (0.958647025, -0.296))
            Line((0.958647025, -0.296), (0.949481873, -0.3))
        make_face()
    revolve(axis=Axis((9.205465963, 16.6, -33.739868004), (0, 1, 0)), mode=Mode.SUBTRACT)


solid = part.part
